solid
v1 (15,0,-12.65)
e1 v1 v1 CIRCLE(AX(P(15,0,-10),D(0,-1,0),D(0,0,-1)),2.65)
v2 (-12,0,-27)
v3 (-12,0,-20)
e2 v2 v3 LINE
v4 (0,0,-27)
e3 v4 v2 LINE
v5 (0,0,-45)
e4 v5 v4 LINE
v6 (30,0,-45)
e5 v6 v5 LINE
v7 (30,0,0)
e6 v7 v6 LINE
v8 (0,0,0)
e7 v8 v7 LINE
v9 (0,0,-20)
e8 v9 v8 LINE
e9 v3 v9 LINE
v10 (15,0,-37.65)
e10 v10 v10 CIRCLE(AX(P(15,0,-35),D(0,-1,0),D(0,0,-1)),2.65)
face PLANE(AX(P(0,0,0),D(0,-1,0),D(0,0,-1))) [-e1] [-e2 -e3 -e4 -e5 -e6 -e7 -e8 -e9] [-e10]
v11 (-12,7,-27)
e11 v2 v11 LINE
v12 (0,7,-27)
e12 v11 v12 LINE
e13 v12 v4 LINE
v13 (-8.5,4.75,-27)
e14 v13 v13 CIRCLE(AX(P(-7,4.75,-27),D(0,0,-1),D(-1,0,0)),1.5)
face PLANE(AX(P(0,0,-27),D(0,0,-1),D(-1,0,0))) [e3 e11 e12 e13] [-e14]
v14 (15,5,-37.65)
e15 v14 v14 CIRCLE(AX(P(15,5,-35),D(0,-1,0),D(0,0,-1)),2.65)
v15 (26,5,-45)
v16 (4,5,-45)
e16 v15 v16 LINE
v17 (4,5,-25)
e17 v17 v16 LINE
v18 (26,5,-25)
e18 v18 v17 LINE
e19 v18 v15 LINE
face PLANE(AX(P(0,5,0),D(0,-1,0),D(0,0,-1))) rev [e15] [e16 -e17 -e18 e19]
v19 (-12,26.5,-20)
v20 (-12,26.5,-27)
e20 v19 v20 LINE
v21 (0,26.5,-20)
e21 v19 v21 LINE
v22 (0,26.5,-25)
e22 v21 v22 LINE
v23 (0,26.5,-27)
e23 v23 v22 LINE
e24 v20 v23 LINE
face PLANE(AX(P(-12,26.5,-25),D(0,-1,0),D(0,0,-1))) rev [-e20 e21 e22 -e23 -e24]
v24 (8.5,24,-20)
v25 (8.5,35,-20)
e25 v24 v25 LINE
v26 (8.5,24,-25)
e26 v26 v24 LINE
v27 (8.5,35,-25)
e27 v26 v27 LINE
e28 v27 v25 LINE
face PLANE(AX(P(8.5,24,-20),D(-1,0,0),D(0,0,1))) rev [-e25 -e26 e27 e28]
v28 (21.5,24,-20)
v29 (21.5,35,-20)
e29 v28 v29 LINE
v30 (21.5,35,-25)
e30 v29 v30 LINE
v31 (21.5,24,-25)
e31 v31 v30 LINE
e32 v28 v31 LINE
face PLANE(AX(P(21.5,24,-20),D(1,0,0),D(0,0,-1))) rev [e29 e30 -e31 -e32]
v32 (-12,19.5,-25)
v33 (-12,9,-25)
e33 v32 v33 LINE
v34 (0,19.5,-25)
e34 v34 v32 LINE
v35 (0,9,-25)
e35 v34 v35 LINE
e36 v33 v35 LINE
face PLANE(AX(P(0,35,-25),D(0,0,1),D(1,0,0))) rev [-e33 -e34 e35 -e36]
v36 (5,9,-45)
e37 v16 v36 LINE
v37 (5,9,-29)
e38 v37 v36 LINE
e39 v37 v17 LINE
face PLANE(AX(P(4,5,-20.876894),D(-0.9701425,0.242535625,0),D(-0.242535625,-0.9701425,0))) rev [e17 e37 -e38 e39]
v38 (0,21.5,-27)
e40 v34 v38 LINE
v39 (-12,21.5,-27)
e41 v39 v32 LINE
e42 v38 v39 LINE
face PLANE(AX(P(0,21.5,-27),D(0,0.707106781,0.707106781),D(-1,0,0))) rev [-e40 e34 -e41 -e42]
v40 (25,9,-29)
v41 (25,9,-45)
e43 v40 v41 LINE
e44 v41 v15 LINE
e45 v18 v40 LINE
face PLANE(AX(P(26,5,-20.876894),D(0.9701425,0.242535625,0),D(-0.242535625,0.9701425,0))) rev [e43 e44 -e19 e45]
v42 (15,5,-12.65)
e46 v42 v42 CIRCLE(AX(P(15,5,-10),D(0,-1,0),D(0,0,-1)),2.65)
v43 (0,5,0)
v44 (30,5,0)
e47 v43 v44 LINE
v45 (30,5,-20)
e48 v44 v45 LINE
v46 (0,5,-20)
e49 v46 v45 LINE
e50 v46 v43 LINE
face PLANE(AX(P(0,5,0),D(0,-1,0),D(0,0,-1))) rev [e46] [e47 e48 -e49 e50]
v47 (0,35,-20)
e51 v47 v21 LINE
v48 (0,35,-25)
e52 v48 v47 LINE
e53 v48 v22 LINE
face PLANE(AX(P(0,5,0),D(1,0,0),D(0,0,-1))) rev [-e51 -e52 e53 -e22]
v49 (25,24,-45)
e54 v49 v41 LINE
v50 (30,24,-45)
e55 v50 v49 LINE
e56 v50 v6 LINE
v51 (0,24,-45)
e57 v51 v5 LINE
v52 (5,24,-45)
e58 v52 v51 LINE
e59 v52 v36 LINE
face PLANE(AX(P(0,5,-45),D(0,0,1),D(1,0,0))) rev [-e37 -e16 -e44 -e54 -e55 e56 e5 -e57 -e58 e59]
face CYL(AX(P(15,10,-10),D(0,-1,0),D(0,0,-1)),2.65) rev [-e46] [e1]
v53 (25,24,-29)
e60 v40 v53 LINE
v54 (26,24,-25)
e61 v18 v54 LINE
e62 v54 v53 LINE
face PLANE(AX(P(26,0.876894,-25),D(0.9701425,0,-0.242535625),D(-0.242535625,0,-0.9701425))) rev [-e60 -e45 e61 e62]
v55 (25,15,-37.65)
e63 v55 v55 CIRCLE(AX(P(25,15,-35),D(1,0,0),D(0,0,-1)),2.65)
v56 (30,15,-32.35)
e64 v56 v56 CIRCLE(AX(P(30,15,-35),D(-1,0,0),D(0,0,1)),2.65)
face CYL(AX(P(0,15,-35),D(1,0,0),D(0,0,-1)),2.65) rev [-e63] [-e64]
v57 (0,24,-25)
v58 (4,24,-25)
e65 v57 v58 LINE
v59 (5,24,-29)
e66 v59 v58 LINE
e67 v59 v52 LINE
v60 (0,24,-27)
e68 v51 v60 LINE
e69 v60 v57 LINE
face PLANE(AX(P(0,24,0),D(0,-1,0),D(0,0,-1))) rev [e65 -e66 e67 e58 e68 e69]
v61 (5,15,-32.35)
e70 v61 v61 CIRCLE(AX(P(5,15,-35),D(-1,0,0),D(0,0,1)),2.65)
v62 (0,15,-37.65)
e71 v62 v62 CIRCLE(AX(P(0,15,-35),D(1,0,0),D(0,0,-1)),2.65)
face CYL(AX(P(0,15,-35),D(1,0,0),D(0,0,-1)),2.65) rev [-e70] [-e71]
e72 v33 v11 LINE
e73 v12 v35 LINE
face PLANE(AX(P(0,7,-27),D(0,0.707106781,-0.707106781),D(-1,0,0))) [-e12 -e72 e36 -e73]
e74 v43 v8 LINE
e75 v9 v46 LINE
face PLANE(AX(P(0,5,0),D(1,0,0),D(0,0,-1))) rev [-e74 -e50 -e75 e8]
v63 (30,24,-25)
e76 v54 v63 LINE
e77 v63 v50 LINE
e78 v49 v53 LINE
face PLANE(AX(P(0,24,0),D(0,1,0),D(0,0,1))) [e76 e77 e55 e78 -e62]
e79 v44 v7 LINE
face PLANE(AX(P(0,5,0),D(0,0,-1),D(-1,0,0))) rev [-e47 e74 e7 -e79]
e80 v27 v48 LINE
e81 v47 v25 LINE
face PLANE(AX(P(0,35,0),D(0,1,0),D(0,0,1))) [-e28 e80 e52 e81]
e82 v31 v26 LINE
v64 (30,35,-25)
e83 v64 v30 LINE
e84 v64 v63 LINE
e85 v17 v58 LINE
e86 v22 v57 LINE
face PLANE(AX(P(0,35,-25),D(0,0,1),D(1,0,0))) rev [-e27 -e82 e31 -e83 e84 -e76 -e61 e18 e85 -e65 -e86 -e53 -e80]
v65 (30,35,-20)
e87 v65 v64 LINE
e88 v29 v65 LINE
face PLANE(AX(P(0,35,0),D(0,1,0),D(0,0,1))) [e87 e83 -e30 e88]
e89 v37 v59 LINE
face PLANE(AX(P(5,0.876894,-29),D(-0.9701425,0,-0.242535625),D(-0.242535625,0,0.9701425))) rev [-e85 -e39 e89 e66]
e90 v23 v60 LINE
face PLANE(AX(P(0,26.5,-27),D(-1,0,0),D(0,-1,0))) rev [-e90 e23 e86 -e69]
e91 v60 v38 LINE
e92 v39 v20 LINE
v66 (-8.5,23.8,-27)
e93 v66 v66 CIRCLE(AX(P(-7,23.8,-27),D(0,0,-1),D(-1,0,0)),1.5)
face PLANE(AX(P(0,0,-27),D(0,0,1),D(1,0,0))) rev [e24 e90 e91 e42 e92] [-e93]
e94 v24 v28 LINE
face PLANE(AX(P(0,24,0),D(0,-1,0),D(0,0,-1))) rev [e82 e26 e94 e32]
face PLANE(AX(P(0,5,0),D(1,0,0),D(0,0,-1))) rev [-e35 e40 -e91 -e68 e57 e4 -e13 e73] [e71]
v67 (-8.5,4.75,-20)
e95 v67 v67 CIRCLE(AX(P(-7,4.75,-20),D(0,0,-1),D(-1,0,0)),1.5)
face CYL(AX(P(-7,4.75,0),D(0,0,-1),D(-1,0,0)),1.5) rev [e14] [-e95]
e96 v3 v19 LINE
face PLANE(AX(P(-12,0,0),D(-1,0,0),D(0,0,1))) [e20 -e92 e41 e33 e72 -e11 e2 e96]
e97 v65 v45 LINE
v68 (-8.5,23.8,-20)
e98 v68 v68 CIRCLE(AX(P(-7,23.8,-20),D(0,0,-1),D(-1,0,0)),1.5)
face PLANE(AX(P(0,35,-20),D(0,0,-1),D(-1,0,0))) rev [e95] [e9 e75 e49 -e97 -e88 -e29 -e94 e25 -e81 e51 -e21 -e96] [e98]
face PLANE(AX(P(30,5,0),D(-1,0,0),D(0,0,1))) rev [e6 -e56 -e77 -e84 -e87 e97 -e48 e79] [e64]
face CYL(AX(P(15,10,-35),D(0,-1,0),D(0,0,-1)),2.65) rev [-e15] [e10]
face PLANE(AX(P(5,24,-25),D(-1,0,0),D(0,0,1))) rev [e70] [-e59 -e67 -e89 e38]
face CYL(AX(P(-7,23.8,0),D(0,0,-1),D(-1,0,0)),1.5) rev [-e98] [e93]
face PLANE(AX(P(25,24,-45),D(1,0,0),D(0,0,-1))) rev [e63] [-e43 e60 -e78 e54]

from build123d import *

# Parameters (mm, degrees)
SKETCH1_W               = 30
SKETCH1_H               = 45
BOSS_EXTRUDE1_DEPTH     = 5
SKETCH2_W               = 30
SKETCH2_H               = 5
BOSS_EXTRUDE2_DEPTH     = 30
SKETCH3_W               = 5
SKETCH3_H               = 20
BOSS_EXTRUDE3_DEPTH     = 19
SKETCH4_W               = 13
SKETCH4_H               = 5
CUT_EXTRUDE1_DEPTH      = 11
SKETCH5_R               = 2.65
CUT_EXTRUDE2_DEPTH      = 10
CUT_EXTRUDE3_DEPTH      = 65.420493634
CUT_EXTRUDE3_DEPTH_BACK = 65.420493634
SKETCH6_R               = 2.65
CUT_EXTRUDE4_DEPTH      = 20
CUT_EXTRUDE5_REACH      = 61.169
SKETCH9_W               = 5
SKETCH9_H               = 26.5
BOSS_EXTRUDE4_DEPTH     = 12
SKETCH10_W              = 12
SKETCH10_H              = 9
SKETCH10_H_2            = 7
BOSS_EXTRUDE5_DEPTH     = 2
CHAMFER1_SIZE           = 2
CHAMFER2_SIZE           = 2
SKETCH11_R              = 1.5
CUT_EXTRUDE6_DEPTH      = 54.422841557


with BuildPart() as part:
    # Sketch1 → Boss-Extrude1 (new body)
    with BuildSketch(Plane(origin=(0, 0, 0), x_dir=(1, 0, 0), z_dir=(0, 1, 0))):
        with Locations((15, 22.5)):
            Rectangle(SKETCH1_W, SKETCH1_H)
    extrude(amount=BOSS_EXTRUDE1_DEPTH)

    # Sketch2 → Boss-Extrude2 (add)
    with BuildSketch(Plane(origin=(0, 5, 0), x_dir=(1, 0, 0), z_dir=(0, 1, 0))):
        with Locations((15, 22.5)):
            Rectangle(SKETCH2_W, SKETCH2_H)
    extrude(amount=BOSS_EXTRUDE2_DEPTH)

    # Sketch3 → Boss-Extrude3 (add)
    with BuildSketch(Plane(origin=(0, 5, 0), x_dir=(1, 0, 0), z_dir=(0, 1, 0))):
        with Locations((2.5, 35)):
            Rectangle(SKETCH3_W, SKETCH3_H)
        with Locations((27.5, 35)):
            Rectangle(SKETCH3_W, SKETCH3_H)
    extrude(amount=BOSS_EXTRUDE3_DEPTH)

    # Sketch4 → Cut-Extrude1 (cut)
    with BuildSketch(Plane(origin=(0, 35, 0), x_dir=(1, 0, 0), z_dir=(0, 1, 0))):
        with Locations((15, 22.5)):
            Rectangle(SKETCH4_W, SKETCH4_H)
    extrude(amount=-CUT_EXTRUDE1_DEPTH, mode=Mode.SUBTRACT)

    # Sketch5 → Cut-Extrude2 (cut)
    with BuildSketch(Plane.XZ):
        with Locations(Location((15, -10, 0), (0, 0, 270))):
            Circle(SKETCH5_R)
        with Locations(Location((15, -35, 0), (0, 0, 270))):
            Circle(SKETCH5_R)
    extrude(amount=-CUT_EXTRUDE2_DEPTH, mode=Mode.SUBTRACT)

    # Sketch6 → Cut-Extrude3 (cut, two sides: drawn at the far end of the back side and taken through both)
    with BuildSketch(Plane(origin=(30, 0, 0), x_dir=(0, 0, -1), z_dir=(1, 0, 0)).offset(-CUT_EXTRUDE3_DEPTH_BACK)):
        with Locations((35, 15)):
            Circle(SKETCH6_R)
    extrude(amount=CUT_EXTRUDE3_DEPTH + CUT_EXTRUDE3_DEPTH_BACK, mode=Mode.SUBTRACT)

    # Sketch7 → Cut-Extrude4 (cut)
    with BuildSketch(Plane(origin=(0, 0, -45), x_dir=(-1, 0, 0), z_dir=(0, 0, -1))):
        Polygon((-25, 5), (-26, 5), (-25, 9), align=None)
        Polygon((-5, 5), (-4, 5), (-5, 9), align=None)
    extrude(amount=-CUT_EXTRUDE4_DEPTH, mode=Mode.SUBTRACT)

    # Cut-Extrude5: up to this face of the body (flat: up to its plane)
    cut_extrude5_end = Plane(part.part.faces().sort_by_distance((0.360555128, 5, -10))[0])
    # Sketch8 → Cut-Extrude5 (cut, up to the picked face)
    with BuildSketch(Plane(origin=(0, 24, 0), x_dir=(1, 0, 0), z_dir=(0, 1, 0)), mode=Mode.PRIVATE) as cut_extrude5_sk1:
        Polygon((25, 25), (26, 25), (25, 29), align=None)
    cut_extrude5_tool1 = split(extrude(cut_extrude5_sk1.sketch, amount=-CUT_EXTRUDE5_REACH, mode=Mode.PRIVATE), bisect_by=cut_extrude5_end, keep=Keep.BOTH, mode=Mode.PRIVATE)
    # Sketch8 → Cut-Extrude5 (cut, up to the picked face)
    with BuildSketch(Plane(origin=(0, 24, 0), x_dir=(1, 0, 0), z_dir=(0, 1, 0)), mode=Mode.PRIVATE) as cut_extrude5_sk2:
        Polygon((5, 25), (5, 29), (4, 25), align=None)
    cut_extrude5_tool2 = split(extrude(cut_extrude5_sk2.sketch, amount=-CUT_EXTRUDE5_REACH, mode=Mode.PRIVATE), bisect_by=cut_extrude5_end, keep=Keep.BOTH, mode=Mode.PRIVATE)
    add(cut_extrude5_tool1.solids().sort_by(Axis((25.333333, 24, -26.333333), (0, -1, 0)))[0], mode=Mode.SUBTRACT)
    add(cut_extrude5_tool2.solids().sort_by(Axis((4.666667, 24, -26.333333), (0, -1, 0)))[0], mode=Mode.SUBTRACT)

    # Sketch9 → Boss-Extrude4 (add)
    with BuildSketch(Plane.ZY):
        with Locations((-22.5, 13.25)):
            Rectangle(SKETCH9_W, SKETCH9_H)
    extrude(amount=BOSS_EXTRUDE4_DEPTH)

    # Sketch10 → Boss-Extrude5 (add)
    with BuildSketch(Plane(origin=(0, 0, -25), x_dir=(-1, 0, 0), z_dir=(0, 0, -1))):
        with Locations((6, 4.5)):
            Rectangle(SKETCH10_W, SKETCH10_H)
        with Locations((6, 23)):
            Rectangle(SKETCH10_W, SKETCH10_H_2)
    extrude(amount=BOSS_EXTRUDE5_DEPTH)

    # Chamfer1
    chamfer1_edges = [part.edges().sort_by_distance(p)[0] for p in [
        (-6, 19.5, -27),
    ]]
    chamfer(chamfer1_edges, length=CHAMFER1_SIZE - 0.0001)  # a hair under: the kernel refuses the full size

    # Chamfer2
    chamfer2_edges = [part.edges().sort_by_distance(p)[0] for p in [
        (-6, 9, -27),
    ]]
    chamfer(chamfer2_edges, length=CHAMFER2_SIZE - 0.0001)  # a hair under: the kernel refuses the full size

    # Sketch11 → Cut-Extrude6 (cut, through all)
    with BuildSketch(Plane(origin=(0, 0, -27), x_dir=(-1, 0, 0), z_dir=(0, 0, -1))):
        with Locations((7, 23.8)):
            Circle(SKETCH11_R)
        with Locations((7, 4.75)):
            Circle(SKETCH11_R)
    extrude(amount=-CUT_EXTRUDE6_DEPTH, mode=Mode.SUBTRACT)


solid = part.part
